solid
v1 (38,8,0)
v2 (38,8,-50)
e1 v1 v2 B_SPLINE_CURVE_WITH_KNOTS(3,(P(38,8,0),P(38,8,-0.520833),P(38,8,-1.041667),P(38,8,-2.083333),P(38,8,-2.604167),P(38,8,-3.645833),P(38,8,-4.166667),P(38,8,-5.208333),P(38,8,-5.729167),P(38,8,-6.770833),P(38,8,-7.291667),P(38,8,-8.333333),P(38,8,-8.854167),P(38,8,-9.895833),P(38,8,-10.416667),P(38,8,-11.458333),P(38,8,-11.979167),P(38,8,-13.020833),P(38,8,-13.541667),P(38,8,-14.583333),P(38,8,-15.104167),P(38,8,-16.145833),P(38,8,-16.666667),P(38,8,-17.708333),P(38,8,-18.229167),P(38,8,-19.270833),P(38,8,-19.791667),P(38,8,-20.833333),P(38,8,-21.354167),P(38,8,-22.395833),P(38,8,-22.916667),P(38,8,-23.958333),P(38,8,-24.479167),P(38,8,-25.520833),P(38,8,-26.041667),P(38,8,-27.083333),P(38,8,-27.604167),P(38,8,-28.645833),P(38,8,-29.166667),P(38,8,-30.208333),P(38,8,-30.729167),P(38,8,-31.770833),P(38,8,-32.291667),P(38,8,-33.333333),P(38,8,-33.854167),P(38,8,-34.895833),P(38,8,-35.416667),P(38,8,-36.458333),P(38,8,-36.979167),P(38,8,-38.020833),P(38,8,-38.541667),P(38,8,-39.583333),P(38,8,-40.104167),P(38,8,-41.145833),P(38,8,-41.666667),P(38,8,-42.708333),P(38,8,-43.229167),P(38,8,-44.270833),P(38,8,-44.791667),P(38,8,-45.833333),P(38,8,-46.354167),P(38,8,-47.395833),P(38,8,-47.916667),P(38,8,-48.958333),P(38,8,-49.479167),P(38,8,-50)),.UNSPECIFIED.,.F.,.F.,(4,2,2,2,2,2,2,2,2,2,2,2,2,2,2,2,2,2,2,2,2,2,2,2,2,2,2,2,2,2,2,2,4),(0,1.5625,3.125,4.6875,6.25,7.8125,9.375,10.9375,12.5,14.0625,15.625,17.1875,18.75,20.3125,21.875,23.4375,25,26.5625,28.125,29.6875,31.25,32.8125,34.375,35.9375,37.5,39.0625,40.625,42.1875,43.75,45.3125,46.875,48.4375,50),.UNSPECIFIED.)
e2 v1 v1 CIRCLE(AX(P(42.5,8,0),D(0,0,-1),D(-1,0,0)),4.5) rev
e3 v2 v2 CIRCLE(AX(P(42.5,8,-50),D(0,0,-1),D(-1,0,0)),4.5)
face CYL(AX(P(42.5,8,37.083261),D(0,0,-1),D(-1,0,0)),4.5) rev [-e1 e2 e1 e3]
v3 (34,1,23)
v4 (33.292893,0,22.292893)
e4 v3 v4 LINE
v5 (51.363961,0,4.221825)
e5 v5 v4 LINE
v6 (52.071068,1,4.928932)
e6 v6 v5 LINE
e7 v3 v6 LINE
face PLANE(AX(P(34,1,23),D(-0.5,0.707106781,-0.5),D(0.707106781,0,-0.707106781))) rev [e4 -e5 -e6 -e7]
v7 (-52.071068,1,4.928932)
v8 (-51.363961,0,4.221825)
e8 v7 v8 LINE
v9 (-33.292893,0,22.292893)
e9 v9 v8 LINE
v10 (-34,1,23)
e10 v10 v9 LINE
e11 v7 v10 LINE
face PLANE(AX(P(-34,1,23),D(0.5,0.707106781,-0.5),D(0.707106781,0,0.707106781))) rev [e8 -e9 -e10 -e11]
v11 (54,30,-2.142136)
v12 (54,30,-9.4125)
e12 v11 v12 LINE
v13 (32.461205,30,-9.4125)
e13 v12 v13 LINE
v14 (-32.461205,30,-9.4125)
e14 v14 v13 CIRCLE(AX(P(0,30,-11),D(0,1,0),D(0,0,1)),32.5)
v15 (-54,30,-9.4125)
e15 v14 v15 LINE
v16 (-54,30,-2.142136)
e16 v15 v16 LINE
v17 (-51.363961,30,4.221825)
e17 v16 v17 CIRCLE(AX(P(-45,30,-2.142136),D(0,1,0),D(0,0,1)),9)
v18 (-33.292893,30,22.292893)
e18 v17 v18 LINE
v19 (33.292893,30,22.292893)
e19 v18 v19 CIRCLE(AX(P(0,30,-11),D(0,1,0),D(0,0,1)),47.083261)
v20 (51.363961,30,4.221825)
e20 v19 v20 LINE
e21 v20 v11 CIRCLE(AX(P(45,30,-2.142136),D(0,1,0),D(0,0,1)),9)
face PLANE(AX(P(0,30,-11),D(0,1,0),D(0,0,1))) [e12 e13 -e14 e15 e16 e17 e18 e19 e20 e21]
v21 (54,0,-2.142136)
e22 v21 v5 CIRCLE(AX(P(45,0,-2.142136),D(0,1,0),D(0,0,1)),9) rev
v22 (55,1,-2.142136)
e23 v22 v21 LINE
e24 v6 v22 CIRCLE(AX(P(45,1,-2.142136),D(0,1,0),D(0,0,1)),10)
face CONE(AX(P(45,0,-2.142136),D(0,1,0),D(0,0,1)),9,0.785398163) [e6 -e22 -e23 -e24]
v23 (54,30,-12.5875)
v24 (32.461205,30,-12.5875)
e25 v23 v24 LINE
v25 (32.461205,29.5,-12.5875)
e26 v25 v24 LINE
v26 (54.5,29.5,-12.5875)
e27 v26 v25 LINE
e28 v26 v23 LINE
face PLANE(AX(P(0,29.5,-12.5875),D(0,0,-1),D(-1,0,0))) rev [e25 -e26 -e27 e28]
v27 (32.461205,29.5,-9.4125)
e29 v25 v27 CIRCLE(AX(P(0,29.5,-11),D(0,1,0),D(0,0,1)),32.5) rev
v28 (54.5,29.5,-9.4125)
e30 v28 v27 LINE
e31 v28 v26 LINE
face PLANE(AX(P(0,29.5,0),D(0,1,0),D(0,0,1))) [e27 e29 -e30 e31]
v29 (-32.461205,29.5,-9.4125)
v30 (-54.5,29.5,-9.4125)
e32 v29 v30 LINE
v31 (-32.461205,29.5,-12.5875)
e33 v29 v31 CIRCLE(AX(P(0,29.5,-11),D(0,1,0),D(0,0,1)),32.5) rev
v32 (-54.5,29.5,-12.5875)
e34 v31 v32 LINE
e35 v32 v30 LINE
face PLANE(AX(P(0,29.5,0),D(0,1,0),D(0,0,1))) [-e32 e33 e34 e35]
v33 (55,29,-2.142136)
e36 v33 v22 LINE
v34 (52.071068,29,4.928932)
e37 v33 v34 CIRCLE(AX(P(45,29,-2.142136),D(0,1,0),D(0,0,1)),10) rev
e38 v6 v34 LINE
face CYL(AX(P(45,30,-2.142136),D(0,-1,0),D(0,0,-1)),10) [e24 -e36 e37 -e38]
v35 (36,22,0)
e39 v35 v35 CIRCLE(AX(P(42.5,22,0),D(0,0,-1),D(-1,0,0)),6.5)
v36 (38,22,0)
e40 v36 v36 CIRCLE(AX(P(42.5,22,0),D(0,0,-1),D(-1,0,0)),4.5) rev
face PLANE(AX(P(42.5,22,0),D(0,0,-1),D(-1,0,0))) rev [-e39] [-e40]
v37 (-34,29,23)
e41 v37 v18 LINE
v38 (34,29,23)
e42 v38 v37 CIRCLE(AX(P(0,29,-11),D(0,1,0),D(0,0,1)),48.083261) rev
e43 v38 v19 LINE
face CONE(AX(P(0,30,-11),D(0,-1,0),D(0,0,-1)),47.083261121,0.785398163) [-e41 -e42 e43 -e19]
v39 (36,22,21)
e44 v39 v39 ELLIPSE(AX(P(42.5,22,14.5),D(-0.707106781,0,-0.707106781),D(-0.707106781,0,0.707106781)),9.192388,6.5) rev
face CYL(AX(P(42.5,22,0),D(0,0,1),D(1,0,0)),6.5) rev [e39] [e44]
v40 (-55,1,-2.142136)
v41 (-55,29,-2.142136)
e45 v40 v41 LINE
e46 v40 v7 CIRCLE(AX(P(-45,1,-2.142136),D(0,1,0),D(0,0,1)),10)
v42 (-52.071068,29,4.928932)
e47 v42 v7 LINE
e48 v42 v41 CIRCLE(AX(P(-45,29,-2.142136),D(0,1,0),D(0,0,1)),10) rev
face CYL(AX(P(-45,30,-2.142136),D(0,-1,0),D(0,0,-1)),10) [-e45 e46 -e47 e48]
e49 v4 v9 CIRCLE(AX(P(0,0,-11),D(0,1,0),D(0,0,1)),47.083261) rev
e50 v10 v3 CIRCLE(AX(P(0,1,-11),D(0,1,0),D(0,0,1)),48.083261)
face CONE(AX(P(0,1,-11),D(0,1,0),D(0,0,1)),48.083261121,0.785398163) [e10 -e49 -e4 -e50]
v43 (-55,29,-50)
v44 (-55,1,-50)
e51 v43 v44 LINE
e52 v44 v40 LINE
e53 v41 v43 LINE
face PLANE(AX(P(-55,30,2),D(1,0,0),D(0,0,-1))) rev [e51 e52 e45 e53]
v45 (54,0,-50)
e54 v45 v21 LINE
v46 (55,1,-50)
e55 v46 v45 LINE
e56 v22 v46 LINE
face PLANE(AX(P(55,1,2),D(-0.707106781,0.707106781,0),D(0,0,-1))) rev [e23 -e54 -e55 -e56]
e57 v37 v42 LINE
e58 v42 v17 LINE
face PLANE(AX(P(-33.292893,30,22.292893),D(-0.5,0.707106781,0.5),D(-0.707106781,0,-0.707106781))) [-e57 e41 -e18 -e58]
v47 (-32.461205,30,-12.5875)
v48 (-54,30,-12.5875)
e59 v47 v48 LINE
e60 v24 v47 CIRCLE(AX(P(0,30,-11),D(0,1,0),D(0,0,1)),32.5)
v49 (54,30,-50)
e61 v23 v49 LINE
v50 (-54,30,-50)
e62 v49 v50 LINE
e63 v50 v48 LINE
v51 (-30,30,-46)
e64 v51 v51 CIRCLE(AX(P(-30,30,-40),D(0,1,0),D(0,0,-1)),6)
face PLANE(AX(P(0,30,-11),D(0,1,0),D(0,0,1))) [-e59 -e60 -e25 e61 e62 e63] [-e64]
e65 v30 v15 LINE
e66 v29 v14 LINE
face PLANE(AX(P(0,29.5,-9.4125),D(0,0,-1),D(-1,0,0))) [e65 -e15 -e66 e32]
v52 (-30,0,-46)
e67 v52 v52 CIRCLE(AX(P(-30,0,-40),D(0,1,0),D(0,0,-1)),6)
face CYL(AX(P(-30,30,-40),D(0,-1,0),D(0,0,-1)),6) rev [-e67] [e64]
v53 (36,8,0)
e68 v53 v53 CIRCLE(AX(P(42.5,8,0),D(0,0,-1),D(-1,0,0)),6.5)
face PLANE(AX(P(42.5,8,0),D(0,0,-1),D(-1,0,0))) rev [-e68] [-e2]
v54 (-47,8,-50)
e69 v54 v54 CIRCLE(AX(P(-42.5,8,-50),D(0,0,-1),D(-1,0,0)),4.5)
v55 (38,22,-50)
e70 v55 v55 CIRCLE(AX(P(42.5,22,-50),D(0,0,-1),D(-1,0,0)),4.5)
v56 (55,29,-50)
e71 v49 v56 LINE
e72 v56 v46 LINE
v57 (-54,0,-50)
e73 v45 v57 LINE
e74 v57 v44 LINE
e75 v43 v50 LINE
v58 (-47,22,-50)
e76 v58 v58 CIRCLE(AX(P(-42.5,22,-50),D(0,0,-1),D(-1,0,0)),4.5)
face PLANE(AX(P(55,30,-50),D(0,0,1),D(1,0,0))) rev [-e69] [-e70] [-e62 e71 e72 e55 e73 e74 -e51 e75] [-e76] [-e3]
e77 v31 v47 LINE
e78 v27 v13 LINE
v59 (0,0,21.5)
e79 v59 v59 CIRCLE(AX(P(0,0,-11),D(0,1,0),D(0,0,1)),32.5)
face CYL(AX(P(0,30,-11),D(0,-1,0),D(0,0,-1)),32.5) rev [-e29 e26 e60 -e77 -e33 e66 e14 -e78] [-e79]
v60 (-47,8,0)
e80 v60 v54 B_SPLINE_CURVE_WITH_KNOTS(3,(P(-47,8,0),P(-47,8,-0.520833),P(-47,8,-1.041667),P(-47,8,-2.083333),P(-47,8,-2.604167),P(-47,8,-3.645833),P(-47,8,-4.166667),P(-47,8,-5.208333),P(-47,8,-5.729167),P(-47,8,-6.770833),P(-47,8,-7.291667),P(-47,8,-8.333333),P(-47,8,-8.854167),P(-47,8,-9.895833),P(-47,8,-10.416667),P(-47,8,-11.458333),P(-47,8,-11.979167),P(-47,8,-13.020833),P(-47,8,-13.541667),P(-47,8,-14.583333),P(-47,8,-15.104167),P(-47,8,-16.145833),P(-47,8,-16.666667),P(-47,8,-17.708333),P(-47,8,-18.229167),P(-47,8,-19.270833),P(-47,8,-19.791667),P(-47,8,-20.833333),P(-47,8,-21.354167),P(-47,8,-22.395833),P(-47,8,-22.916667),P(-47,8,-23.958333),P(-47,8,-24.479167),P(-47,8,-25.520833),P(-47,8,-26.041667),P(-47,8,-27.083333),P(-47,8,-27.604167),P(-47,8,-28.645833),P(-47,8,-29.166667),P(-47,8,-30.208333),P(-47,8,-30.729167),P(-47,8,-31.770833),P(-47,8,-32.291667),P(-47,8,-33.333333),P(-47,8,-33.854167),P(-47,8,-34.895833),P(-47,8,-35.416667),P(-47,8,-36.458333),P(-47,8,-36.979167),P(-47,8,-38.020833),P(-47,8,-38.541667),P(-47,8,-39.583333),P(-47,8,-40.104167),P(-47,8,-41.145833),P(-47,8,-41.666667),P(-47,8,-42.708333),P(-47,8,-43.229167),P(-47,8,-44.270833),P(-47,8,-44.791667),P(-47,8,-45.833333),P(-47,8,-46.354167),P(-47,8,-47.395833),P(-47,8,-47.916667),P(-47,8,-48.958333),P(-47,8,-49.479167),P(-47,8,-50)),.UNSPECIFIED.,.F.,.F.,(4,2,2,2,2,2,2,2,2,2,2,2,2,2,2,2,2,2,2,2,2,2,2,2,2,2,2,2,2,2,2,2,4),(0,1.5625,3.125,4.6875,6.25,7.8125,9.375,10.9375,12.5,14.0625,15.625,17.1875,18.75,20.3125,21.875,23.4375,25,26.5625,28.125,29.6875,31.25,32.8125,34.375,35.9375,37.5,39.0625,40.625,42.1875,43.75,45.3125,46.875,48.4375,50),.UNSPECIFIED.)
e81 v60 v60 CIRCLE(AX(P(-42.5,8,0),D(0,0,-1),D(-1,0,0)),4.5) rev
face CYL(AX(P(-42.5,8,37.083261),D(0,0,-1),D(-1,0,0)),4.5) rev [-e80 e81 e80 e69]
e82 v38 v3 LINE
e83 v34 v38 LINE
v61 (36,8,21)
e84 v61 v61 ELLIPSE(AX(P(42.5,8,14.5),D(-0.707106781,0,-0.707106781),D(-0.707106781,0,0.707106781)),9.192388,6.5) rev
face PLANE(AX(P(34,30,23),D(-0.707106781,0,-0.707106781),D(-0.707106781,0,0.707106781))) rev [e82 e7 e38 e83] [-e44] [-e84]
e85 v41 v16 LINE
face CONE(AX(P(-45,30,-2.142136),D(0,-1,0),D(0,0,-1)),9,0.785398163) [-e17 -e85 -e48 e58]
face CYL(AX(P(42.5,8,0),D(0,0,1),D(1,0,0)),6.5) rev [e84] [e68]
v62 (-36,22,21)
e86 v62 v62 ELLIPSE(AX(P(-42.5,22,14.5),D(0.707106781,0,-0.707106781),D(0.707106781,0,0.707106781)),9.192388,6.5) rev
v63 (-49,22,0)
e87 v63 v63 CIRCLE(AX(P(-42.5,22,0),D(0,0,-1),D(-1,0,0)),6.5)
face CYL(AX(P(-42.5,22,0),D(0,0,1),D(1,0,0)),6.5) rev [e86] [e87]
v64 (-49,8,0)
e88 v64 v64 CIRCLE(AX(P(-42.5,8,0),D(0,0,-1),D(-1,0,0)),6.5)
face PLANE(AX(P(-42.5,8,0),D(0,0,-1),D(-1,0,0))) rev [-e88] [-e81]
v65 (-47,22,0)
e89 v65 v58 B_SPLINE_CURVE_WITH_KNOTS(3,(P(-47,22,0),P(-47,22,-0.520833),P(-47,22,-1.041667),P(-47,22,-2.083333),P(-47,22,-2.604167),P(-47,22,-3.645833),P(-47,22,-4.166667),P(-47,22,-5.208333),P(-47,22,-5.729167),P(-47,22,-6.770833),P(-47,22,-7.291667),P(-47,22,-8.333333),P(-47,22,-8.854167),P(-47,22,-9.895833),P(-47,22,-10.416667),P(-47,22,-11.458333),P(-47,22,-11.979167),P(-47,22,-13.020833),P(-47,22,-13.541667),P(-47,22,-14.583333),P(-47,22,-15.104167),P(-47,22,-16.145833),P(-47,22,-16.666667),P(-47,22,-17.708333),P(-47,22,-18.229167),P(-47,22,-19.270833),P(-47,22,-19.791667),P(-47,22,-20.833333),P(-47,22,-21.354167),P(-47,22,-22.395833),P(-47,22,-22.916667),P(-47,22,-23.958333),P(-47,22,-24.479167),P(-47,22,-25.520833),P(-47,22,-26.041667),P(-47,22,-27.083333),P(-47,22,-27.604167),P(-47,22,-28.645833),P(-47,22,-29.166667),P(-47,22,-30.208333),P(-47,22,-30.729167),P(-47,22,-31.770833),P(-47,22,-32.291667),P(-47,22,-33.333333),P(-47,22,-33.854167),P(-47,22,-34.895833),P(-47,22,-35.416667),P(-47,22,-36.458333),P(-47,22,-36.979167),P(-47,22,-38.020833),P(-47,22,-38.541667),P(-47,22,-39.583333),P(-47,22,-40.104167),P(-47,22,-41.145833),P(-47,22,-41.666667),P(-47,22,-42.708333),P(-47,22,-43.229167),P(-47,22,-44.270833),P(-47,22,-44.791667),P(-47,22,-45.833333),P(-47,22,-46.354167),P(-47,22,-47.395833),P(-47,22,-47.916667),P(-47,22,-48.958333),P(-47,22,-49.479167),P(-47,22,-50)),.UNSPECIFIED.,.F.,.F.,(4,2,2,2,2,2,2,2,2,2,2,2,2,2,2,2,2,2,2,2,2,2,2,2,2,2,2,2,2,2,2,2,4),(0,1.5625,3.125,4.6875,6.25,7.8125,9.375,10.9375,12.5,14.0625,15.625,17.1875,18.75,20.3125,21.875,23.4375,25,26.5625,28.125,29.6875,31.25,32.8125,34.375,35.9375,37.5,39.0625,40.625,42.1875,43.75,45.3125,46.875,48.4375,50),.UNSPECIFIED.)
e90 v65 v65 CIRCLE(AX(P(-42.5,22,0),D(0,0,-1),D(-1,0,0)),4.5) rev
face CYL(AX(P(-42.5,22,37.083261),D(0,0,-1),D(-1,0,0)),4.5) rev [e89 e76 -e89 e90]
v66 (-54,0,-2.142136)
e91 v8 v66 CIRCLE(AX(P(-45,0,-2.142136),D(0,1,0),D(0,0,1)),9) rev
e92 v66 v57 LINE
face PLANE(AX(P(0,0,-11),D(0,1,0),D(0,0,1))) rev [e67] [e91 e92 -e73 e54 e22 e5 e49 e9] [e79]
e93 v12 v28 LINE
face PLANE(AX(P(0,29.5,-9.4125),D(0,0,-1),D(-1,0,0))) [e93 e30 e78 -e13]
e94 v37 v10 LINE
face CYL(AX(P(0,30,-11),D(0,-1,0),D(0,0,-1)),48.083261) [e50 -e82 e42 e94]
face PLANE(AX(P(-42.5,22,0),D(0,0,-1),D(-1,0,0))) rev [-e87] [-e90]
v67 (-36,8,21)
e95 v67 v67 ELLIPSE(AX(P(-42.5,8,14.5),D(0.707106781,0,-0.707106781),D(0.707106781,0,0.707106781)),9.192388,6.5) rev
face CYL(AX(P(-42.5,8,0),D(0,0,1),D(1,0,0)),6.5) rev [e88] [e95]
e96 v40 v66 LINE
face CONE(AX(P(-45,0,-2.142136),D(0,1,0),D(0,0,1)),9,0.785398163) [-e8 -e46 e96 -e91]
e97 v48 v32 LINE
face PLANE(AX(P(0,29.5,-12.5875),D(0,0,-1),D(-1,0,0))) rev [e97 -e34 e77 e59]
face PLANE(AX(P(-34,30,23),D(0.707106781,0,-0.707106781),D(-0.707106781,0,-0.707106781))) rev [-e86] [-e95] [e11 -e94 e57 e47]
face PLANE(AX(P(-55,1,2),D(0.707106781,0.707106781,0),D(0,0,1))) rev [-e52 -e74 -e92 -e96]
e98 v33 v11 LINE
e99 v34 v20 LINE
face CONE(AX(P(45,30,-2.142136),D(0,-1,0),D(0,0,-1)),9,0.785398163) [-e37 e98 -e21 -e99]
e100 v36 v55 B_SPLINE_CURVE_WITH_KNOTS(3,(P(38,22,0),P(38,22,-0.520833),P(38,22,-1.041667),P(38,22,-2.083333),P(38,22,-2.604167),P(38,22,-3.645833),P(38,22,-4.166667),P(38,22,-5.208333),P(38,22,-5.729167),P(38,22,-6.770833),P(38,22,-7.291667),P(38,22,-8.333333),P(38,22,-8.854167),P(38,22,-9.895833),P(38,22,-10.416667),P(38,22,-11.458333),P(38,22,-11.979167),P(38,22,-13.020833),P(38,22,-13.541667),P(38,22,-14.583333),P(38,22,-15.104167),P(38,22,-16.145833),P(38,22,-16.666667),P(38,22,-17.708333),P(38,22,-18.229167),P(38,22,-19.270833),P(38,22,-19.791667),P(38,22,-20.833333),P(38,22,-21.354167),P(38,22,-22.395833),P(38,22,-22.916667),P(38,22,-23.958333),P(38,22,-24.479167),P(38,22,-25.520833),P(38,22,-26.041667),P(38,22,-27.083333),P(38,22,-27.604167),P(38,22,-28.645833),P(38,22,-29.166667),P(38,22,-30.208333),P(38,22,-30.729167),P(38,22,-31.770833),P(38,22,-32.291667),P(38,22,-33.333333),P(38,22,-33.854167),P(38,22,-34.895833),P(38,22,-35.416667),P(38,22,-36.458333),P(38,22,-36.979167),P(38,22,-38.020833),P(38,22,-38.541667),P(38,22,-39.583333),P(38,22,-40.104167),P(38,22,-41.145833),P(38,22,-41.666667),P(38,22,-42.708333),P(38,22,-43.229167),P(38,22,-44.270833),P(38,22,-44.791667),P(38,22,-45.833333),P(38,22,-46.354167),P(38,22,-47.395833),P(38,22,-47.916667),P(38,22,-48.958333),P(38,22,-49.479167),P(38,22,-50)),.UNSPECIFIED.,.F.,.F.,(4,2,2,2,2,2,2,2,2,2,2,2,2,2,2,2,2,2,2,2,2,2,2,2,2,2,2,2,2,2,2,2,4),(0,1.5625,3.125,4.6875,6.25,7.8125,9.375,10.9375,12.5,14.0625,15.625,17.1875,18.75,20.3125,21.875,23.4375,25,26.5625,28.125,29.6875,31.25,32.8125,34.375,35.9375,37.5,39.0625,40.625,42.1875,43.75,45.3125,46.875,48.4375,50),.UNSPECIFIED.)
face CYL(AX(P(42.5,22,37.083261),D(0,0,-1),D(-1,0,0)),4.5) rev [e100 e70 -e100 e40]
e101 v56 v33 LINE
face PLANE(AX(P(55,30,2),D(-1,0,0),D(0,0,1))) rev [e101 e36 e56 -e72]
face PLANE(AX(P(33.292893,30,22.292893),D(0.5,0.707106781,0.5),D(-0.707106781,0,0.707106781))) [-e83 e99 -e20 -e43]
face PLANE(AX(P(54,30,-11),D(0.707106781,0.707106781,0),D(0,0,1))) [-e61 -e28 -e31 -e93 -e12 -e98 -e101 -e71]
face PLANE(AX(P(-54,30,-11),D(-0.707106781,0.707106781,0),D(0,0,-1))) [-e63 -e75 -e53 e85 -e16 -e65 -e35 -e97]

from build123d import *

# Parameters (mm, degrees)
SKETCH1_R               = 32.5
SKETCH1_R_2             = 6
BOSS_EXTRUDE1_DEPTH     = 30
CUT_EXTRUDE1_START      = -0.5
CUT_EXTRUDE1_DEPTH      = 0.5
SKETCH3_R               = 4.5
CUT_EXTRUDE2_DEPTH      = 108.277650829
CUT_EXTRUDE3_DEPTH      = 10
CUT_EXTRUDE3_DEPTH_BACK = 25
SKETCH4_R               = 6.5
FILLET1_R               = 10
CHAMFER1_SIZE           = 1
CHAMFER2_SIZE           = 1


with BuildPart() as part:
    # Sketch1 → Boss-Extrude1 (new body)
    with BuildSketch(Plane(origin=(0, 0, 0), x_dir=(1, 0, 0), z_dir=(0, 1, 0))):
        with BuildLine():
            Line((-34, -23), (-55, -2))
            Line((-55, -2), (-55, 50))
            Line((-55, 50), (55, 50))
            Line((55, 50), (55, -2))
            Line((55, -2), (34, -23))
            ThreePointArc((34, -23), (0, -37.083261121), (-34, -23))
        make_face()
        with Locations((0, 11)):
            Circle(SKETCH1_R, mode=Mode.SUBTRACT)
        with Locations((-30, 40)):
            Circle(SKETCH1_R_2, mode=Mode.SUBTRACT)
    extrude(amount=BOSS_EXTRUDE1_DEPTH)

    # Sketch2 → Cut-Extrude1 (cut)
    with BuildSketch(Plane(origin=(0, 30, 0), x_dir=(1, 0, 0), z_dir=(0, 1, 0)).offset(CUT_EXTRUDE1_START)):
        with BuildLine():
            ThreePointArc((-32.461205211, 9.4125), (-32.5, 11), (-32.461205211, 12.5875))
            Line((-32.461205211, 12.5875), (-55, 12.5875))
            Line((-55, 12.5875), (-55, 9.4125))
            Line((-55, 9.4125), (-32.461205211, 9.4125))
        make_face()
        with BuildLine():
            ThreePointArc((32.461205211, 12.5875), (32.5, 11), (32.461205211, 9.4125))
            Line((32.461205211, 9.4125), (55, 9.4125))
            Line((55, 9.4125), (55, 12.5875))
            Line((55, 12.5875), (32.461205211, 12.5875))
        make_face()
    extrude(amount=CUT_EXTRUDE1_DEPTH, mode=Mode.SUBTRACT)

    # Sketch3 → Cut-Extrude2 (cut, through all)
    with BuildSketch(Plane(origin=(0, 0, -50), x_dir=(-1, 0, 0), z_dir=(0, 0, -1))):
        with Locations((42.5, 8)):
            Circle(SKETCH3_R)
        with Locations((-42.5, 8)):
            Circle(SKETCH3_R)
        with Locations((-42.5, 22)):
            Circle(SKETCH3_R)
        with Locations((42.5, 22)):
            Circle(SKETCH3_R)
    extrude(amount=-CUT_EXTRUDE2_DEPTH, mode=Mode.SUBTRACT)

    # Sketch4 → Cut-Extrude3 (cut, two sides: drawn at the far end of the back side and taken through both)
    with BuildSketch(Plane(origin=(0, 0, 10), x_dir=(-1, 0, 0), z_dir=(0, 0, -1)).offset(-CUT_EXTRUDE3_DEPTH_BACK)):
        with Locations((-42.5, 22)):
            Circle(SKETCH4_R)
        with Locations((-42.5, 8)):
            Circle(SKETCH4_R)
        with Locations((42.5, 8)):
            Circle(SKETCH4_R)
        with Locations((42.5, 22)):
            Circle(SKETCH4_R)
    extrude(amount=CUT_EXTRUDE3_DEPTH + CUT_EXTRUDE3_DEPTH_BACK, mode=Mode.SUBTRACT)

    # Fillet1
    fillet1_edges = [part.edges().sort_by_distance(p)[0] for p in [
        (-55, 15, 2),
        (55, 15, 2),
    ]]
    fillet(fillet1_edges, radius=FILLET1_R)

    # Chamfer1
    chamfer1_edges = [part.edges().sort_by_distance(p)[0] for p in [
        (43.035533906, 30, 13.964466094),
        (54.238795325, 30, 1.6846987),
        (0, 30, 37.083261121),
        (55, 30, -5.777317812),
        (-43.035533906, 30, 13.964466094),
        (-54.238795325, 30, 1.6846987),
        (-55, 30, -5.777317812),
    ]]
    chamfer(chamfer1_edges, length=CHAMFER1_SIZE)

    # Chamfer2
    chamfer2_edges = [part.edges().sort_by_distance(p)[0] for p in [
        (55, 0, -26.071067812),
        (43.035533906, 0, 13.964466094),
        (0, 0, 37.083261121),
        (-43.035533906, 0, 13.964466094),
        (-55, 0, -26.071067812),
        (54.238795325, 0, 1.6846987),
        (-54.238795325, 0, 1.6846987),
    ]]
    chamfer(chamfer2_edges, length=CHAMFER2_SIZE)


solid = part.part
